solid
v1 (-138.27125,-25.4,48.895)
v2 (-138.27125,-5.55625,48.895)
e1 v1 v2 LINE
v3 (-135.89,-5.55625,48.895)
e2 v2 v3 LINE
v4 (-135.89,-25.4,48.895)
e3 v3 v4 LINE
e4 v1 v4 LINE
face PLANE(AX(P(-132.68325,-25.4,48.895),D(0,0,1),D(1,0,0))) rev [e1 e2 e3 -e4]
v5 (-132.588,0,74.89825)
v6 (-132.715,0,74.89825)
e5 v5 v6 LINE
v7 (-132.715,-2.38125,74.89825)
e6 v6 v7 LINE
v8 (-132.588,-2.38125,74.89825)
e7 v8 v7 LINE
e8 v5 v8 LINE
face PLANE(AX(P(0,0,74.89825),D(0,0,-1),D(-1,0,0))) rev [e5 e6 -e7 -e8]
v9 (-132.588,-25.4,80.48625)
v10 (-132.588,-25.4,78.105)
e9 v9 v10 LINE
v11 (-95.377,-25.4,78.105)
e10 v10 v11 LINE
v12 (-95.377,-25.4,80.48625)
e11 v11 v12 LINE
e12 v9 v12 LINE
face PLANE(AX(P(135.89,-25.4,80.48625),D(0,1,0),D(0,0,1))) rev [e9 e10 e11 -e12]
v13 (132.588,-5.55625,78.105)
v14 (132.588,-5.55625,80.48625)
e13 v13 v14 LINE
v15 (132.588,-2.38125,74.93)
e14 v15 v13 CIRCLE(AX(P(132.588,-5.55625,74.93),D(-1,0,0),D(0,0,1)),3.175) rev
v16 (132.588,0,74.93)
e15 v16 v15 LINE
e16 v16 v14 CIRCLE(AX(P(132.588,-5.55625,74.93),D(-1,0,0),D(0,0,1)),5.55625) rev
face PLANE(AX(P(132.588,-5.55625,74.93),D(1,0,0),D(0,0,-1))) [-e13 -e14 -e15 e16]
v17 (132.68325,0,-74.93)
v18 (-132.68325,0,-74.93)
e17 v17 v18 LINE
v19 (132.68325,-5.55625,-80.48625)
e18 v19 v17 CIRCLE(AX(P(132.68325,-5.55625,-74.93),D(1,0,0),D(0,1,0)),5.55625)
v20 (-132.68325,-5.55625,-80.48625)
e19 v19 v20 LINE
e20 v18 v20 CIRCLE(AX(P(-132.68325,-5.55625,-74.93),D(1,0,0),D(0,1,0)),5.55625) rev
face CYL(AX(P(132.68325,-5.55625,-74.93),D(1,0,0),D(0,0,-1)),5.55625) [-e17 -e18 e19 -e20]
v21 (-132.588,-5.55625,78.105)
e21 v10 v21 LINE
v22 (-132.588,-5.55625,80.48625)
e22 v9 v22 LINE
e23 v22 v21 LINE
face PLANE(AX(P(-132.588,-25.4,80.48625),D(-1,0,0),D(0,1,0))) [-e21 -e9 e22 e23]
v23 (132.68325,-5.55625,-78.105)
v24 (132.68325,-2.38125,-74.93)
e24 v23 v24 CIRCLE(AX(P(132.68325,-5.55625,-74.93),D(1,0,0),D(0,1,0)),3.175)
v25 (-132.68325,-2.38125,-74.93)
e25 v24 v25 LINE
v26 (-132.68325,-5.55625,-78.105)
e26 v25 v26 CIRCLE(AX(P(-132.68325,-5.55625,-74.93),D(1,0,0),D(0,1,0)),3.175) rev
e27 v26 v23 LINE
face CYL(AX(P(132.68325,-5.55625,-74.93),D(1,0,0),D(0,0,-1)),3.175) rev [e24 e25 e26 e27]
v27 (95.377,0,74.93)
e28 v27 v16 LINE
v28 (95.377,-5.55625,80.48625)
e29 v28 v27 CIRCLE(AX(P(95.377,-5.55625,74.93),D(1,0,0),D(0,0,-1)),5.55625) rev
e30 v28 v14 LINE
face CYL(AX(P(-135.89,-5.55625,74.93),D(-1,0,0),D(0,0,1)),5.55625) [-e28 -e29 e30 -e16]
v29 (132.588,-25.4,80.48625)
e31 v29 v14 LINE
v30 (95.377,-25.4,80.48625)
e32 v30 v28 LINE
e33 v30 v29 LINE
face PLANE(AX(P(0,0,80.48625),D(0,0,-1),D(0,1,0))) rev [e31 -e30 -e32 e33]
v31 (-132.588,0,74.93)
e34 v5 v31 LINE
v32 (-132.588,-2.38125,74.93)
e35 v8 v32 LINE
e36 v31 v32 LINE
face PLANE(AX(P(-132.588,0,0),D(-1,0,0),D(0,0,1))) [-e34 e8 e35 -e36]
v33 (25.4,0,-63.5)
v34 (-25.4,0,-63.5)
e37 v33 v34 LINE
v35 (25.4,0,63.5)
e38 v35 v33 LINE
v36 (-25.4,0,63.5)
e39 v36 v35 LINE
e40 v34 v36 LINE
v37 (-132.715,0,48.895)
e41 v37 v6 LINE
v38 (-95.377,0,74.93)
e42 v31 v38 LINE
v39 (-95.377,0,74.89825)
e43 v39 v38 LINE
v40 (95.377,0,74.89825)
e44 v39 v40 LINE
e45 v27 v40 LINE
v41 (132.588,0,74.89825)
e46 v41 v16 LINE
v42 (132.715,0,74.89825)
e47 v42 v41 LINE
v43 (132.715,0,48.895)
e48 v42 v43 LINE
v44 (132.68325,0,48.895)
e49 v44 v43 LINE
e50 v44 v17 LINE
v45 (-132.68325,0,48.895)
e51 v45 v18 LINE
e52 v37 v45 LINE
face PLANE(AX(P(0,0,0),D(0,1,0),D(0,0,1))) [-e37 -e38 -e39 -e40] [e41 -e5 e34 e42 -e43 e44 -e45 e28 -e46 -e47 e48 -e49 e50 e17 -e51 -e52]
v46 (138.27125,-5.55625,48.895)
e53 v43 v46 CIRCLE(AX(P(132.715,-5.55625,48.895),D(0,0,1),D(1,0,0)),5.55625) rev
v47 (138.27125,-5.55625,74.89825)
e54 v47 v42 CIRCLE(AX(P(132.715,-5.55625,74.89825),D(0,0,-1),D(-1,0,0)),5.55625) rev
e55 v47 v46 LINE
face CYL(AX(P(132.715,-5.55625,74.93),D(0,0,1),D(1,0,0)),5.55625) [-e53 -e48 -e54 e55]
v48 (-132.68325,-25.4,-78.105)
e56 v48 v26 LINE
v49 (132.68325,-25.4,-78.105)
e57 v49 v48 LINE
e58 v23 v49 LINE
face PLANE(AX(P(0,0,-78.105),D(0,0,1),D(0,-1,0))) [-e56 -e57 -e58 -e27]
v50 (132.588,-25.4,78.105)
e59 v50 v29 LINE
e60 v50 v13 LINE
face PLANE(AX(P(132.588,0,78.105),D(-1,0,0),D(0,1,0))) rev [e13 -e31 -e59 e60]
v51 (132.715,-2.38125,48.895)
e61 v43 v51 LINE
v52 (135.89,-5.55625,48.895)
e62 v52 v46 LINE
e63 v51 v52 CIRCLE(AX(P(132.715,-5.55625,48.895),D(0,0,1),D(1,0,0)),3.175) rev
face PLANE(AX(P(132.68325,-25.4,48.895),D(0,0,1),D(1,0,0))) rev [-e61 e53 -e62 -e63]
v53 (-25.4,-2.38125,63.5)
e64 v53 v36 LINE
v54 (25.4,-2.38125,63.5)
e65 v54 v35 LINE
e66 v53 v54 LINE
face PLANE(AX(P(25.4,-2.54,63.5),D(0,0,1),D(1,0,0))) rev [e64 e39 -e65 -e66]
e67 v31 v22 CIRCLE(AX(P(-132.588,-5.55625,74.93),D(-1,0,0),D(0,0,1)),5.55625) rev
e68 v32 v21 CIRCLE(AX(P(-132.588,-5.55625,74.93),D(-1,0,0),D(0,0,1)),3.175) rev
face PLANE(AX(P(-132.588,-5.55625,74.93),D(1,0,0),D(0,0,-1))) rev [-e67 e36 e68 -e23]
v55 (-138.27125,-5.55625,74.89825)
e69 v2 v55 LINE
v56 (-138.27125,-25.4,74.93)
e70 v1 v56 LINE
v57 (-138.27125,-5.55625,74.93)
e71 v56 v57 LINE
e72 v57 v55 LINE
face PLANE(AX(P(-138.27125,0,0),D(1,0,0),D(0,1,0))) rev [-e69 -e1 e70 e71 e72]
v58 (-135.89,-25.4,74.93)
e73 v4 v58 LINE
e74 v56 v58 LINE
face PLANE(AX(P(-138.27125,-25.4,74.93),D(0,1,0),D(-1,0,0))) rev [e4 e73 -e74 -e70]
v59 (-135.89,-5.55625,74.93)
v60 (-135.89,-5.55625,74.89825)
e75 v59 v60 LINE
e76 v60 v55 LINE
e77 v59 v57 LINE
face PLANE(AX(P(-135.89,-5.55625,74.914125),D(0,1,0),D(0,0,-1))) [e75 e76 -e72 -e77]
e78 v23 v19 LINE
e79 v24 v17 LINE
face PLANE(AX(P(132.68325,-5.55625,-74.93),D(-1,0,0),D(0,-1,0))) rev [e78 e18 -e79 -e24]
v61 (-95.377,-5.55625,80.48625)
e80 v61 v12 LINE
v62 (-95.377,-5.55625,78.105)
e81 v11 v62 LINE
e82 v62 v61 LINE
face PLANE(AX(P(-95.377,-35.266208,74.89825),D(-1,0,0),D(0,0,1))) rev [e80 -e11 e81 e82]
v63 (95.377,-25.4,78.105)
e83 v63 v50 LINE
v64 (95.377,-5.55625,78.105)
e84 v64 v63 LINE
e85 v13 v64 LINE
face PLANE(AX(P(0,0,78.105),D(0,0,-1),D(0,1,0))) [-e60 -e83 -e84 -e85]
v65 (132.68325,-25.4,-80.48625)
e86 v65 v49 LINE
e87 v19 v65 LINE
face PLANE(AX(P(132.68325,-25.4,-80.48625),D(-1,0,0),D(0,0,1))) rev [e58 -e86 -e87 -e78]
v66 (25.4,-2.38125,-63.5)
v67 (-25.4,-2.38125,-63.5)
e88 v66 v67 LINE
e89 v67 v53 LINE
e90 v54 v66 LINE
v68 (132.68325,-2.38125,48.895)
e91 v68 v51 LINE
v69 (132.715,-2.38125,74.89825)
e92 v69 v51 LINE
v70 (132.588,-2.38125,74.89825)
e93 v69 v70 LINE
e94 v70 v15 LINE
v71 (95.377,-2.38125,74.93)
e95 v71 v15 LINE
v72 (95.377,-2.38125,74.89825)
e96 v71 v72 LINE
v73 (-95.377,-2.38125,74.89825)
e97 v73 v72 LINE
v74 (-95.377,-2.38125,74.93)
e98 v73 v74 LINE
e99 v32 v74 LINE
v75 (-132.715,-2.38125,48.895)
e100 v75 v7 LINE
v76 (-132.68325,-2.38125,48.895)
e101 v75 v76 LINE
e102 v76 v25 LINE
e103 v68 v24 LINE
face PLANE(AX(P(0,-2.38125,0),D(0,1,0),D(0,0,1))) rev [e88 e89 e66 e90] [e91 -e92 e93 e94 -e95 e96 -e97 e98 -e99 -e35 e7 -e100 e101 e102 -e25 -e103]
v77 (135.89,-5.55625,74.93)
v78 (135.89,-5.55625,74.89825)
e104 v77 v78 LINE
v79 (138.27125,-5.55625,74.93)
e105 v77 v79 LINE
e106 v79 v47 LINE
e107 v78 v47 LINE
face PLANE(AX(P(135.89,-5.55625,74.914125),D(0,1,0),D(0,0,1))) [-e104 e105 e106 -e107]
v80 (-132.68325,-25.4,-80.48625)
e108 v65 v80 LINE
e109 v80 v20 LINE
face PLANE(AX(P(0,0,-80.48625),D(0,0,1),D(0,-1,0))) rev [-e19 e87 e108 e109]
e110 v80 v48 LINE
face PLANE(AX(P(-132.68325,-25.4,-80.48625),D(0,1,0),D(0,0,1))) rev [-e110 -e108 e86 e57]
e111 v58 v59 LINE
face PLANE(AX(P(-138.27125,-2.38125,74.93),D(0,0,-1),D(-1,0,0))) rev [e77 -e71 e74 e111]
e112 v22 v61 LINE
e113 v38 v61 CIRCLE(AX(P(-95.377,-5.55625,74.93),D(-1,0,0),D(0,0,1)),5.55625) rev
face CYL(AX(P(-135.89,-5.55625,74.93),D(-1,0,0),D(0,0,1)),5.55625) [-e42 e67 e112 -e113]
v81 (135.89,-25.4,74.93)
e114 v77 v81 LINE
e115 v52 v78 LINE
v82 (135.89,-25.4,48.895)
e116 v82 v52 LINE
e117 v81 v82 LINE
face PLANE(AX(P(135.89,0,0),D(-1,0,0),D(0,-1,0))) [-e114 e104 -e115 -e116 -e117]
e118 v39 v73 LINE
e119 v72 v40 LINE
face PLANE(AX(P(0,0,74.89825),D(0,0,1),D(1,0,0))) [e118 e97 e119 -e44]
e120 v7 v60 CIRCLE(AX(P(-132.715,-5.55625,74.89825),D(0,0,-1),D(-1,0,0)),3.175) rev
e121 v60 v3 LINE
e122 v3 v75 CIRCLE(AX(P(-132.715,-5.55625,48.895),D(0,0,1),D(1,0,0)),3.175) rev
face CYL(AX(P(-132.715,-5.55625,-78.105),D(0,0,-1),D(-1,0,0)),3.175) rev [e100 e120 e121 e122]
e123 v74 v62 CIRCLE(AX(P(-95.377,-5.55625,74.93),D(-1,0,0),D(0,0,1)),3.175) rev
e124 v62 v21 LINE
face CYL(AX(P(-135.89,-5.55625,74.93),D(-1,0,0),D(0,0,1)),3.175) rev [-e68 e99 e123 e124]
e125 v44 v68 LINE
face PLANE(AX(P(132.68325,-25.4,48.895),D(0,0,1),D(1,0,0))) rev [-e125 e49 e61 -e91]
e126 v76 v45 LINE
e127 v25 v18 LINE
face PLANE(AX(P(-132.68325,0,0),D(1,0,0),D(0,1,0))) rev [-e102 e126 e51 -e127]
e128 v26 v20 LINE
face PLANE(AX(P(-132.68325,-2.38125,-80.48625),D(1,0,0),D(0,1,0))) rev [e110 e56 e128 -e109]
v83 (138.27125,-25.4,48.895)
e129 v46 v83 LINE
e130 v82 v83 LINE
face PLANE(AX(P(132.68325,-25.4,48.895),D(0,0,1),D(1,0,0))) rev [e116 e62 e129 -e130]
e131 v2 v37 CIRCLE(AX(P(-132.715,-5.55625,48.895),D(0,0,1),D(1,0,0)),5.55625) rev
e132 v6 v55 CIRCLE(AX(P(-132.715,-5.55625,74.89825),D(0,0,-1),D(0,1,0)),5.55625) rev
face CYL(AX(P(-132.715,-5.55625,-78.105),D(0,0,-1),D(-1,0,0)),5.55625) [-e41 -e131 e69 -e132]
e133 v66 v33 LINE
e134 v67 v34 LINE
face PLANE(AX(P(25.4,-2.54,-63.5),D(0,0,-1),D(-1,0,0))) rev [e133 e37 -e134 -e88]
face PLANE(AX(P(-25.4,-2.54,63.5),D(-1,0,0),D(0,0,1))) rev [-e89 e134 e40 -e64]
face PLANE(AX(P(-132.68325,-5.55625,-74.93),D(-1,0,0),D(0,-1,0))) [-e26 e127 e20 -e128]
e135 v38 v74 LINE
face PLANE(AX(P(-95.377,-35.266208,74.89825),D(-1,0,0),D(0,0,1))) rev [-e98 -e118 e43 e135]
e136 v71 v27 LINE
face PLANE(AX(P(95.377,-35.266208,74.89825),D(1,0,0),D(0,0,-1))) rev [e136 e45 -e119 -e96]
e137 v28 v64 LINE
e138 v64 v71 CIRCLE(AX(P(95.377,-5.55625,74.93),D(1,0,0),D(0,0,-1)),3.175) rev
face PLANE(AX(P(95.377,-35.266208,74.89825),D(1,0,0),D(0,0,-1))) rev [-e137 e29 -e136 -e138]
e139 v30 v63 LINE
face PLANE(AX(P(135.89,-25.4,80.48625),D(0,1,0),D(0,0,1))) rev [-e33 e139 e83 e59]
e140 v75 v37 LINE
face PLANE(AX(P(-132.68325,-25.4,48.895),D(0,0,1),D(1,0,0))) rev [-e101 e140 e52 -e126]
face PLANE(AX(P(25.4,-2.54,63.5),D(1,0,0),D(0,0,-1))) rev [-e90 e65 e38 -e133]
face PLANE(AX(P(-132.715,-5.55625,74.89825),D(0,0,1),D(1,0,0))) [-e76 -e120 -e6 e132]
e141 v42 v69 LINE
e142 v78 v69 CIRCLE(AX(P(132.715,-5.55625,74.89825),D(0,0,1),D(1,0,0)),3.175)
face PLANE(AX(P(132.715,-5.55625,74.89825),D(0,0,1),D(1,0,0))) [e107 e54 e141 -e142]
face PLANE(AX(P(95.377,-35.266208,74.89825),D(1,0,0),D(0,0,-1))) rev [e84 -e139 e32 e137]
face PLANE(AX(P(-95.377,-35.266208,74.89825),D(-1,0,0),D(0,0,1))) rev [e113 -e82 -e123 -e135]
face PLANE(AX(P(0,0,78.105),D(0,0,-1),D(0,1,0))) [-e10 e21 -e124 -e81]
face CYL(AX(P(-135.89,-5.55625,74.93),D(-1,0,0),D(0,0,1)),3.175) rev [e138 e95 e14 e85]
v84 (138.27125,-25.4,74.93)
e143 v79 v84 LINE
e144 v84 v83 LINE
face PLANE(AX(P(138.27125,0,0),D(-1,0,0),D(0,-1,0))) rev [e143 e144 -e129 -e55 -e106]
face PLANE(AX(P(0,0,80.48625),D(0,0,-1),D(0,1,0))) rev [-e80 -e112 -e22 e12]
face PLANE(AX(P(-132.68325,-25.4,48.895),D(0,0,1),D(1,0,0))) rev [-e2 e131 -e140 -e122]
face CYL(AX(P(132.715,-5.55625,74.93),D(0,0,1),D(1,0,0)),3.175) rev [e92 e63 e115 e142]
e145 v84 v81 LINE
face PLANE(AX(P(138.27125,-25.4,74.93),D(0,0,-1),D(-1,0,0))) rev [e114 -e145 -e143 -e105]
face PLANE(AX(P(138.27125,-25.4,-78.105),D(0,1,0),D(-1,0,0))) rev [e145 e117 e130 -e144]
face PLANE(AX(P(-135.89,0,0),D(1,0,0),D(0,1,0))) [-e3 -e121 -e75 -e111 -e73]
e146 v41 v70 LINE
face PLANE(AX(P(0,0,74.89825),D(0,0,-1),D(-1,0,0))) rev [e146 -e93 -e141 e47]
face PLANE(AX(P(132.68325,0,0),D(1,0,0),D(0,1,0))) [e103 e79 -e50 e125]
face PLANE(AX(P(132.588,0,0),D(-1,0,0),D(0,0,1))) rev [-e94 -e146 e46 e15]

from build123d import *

# Parameters (mm, degrees)
SKETCH1_W                    = 271.78
SKETCH1_H                    = 156.21
BASE_FLANGE1_DEPTH           = 2.38125
EDGE_FLANGE1_STRIP_W         = 15.875
EDGE_FLANGE1_STRIP_H         = 2.38125
EDGE_FLANGE1_STRIP_CUT_DEPTH = 271.78
EDGE_FLANGE1_DEPTH           = 271.78
EDGE_FLANGE2_STRIP_W         = 15.875
EDGE_FLANGE2_STRIP_H         = 2.38125
EDGE_FLANGE2_STRIP_CUT_DEPTH = 153.035
EDGE_FLANGE2_DEPTH           = 153.035
SKETCH14_W                   = 127
SKETCH14_H                   = 30.097595223
CUT_EXTRUDE1_DEPTH           = 5.588
EDGE_FLANGE3_STRIP_W         = 15.875
EDGE_FLANGE3_STRIP_H         = 2.38125
EDGE_FLANGE3_STRIP_CUT_DEPTH = 153.035
EDGE_FLANGE3_DEPTH           = 153.035
SKETCH18_W                   = 127
SKETCH18_H                   = 45.504454023
CUT_EXTRUDE2_DEPTH           = 5.588
CUT_EXTRUDE3_START           = -3.302
CUT_EXTRUDE3_DEPTH           = 5.68325
CUT_EXTRUDE4_START           = -3.302
CUT_EXTRUDE4_DEPTH           = 5.68325
EDGE_FLANGE4_STRIP_W         = 15.875
EDGE_FLANGE4_STRIP_H         = 2.38125
EDGE_FLANGE4_STRIP_CUT_DEPTH = 265.3665
EDGE_FLANGE4_DEPTH           = 265.3665
SKETCH24_W                   = 190.754
SKETCH24_H                   = 70.532416994
CUT_EXTRUDE5_DEPTH           = 5.588
SKETCH25_W                   = 50.8
SKETCH25_H                   = 127
CUT_EXTRUDE6_DEPTH           = 2.54


# Read off the part's stored shape, not the designer's step: Cut-Extrude3, Cut-Extrude4
# Sheet-metal steps are written as plain solids
with BuildPart() as part:
    # Sketch1 → Base-Flange1 (new body)
    with BuildSketch(Plane(origin=(0, 0, 0), x_dir=(1, 0, 0), z_dir=(0, 1, 0))):
        Rectangle(SKETCH1_W, SKETCH1_H)
    extrude(amount=-BASE_FLANGE1_DEPTH)

    # Edge-Flange1 strip (across the edge) → Edge-Flange1 strip cut (cut)
    with BuildSketch(Plane(origin=(135.89, -2.38125, 78.105), x_dir=(0, 0, -1), z_dir=(-1, 0, 0))):
        with Locations((-4.7625, -1.190625)):
            Rectangle(EDGE_FLANGE1_STRIP_W, EDGE_FLANGE1_STRIP_H)
    extrude(amount=EDGE_FLANGE1_STRIP_CUT_DEPTH, mode=Mode.SUBTRACT)

    # Edge-Flange1 section (across the edge) → Edge-Flange1 (add)
    with BuildSketch(Plane(origin=(135.89, -2.38125, 78.105), x_dir=(0, 0, -1), z_dir=(-1, 0, 0))):
        with BuildLine():
            Line((-2.38125, 3.175), (-2.38125, 23.01875))
            Line((-2.38125, 23.01875), (0, 23.01875))
            Line((0, 23.01875), (0, 3.175))
            ThreePointArc((0, 3.175), (0.92993597, 0.92993597), (3.175, 0))
            Line((3.175, 0), (3.175, -2.38125))
            ThreePointArc((3.175, -2.38125), (-0.753862053, -0.753862053), (-2.38125, 3.175))
        make_face()
    extrude(amount=EDGE_FLANGE1_DEPTH)

    # Edge-Flange2 strip (across the edge) → Edge-Flange2 strip cut (cut)
    with BuildSketch(Plane(origin=(135.89, -2.38125, -78.105), x_dir=(-1, 0, 0), z_dir=(0, 0, 1))):
        with Locations((-4.7625, -1.190625)):
            Rectangle(EDGE_FLANGE2_STRIP_W, EDGE_FLANGE2_STRIP_H)
    extrude(amount=EDGE_FLANGE2_STRIP_CUT_DEPTH, mode=Mode.SUBTRACT)

    # Edge-Flange2 section (across the edge) → Edge-Flange2 (add)
    with BuildSketch(Plane(origin=(135.89, -2.38125, -78.105), x_dir=(-1, 0, 0), z_dir=(0, 0, 1))):
        with BuildLine():
            Line((-2.38125, 3.175), (-2.38125, 23.01875))
            Line((-2.38125, 23.01875), (0, 23.01875))
            Line((0, 23.01875), (0, 3.175))
            ThreePointArc((0, 3.175), (0.92993597, 0.92993597), (3.175, 0))
            Line((3.175, 0), (3.175, -2.38125))
            ThreePointArc((3.175, -2.38125), (-0.753862053, -0.753862053), (-2.38125, 3.175))
        make_face()
    extrude(amount=EDGE_FLANGE2_DEPTH)

    # Sketch14 → Cut-Extrude1 (cut)
    with BuildSketch(Plane(origin=(138.27125, 0, 0), x_dir=(0, 0, -1), z_dir=(1, 0, 0))):
        with Locations((14.605, -10.351202389)):
            Rectangle(SKETCH14_W, SKETCH14_H)
    extrude(amount=-CUT_EXTRUDE1_DEPTH, mode=Mode.SUBTRACT)

    # Edge-Flange3 strip (across the edge) → Edge-Flange3 strip cut (cut)
    with BuildSketch(Plane(origin=(-135.89, -2.38125, 74.93), x_dir=(1, 0, 0), z_dir=(0, 0, -1))):
        with Locations((-4.7625, -1.190625)):
            Rectangle(EDGE_FLANGE3_STRIP_W, EDGE_FLANGE3_STRIP_H)
    extrude(amount=EDGE_FLANGE3_STRIP_CUT_DEPTH, mode=Mode.SUBTRACT)

    # Edge-Flange3 section (across the edge) → Edge-Flange3 (add)
    with BuildSketch(Plane(origin=(-135.89, -2.38125, 74.93), x_dir=(1, 0, 0), z_dir=(0, 0, -1))):
        with BuildLine():
            Line((-2.38125, 3.175), (-2.38125, 23.01875))
            Line((-2.38125, 23.01875), (0, 23.01875))
            Line((0, 23.01875), (0, 3.175))
            ThreePointArc((0, 3.175), (0.92993597, 0.92993597), (3.175, 0))
            Line((3.175, 0), (3.175, -2.38125))
            ThreePointArc((3.175, -2.38125), (-0.753862053, -0.753862053), (-2.38125, 3.175))
        make_face()
    extrude(amount=EDGE_FLANGE3_DEPTH)

    # Sketch18 → Cut-Extrude2 (cut)
    with BuildSketch(Plane.ZY.offset(138.27125)):
        with Locations((-14.605, -2.647772988)):
            Rectangle(SKETCH18_W, SKETCH18_H)
    extrude(amount=-CUT_EXTRUDE2_DEPTH, mode=Mode.SUBTRACT)

    # Cut-Extrude3 outline → Cut-Extrude3 (cut)
    with BuildSketch(Plane.ZY.offset(135.89).offset(CUT_EXTRUDE3_START)):
        with BuildLine():
            Line((74.93, 0), (74.89825, 0))
            Line((74.89825, 0), (74.89825, -5.55625))
            Line((74.89825, -5.55625), (74.93, -5.55625))
            Line((74.93, -5.55625), (74.93, -2.38125))
            ThreePointArc((74.93, -2.38125), (77.17506403, -3.31118597), (78.105, -5.55625))
            Line((78.105, -5.55625), (78.105, -25.4))
            Line((78.105, -25.4), (80.48625, -25.4))
            Line((80.48625, -25.4), (80.48625, -5.55625))
            ThreePointArc((80.48625, -5.55625), (78.858862053, -1.627387947), (74.93, 0))
        make_face()
    extrude(amount=CUT_EXTRUDE3_DEPTH, mode=Mode.SUBTRACT)

    # Cut-Extrude4 outline → Cut-Extrude4 (cut)
    with BuildSketch(Plane(origin=(135.89, 0, 0), x_dir=(0, 0, -1), z_dir=(1, 0, 0)).offset(CUT_EXTRUDE4_START)):
        with BuildLine():
            Line((-74.89825, 0), (-74.93, 0))
            ThreePointArc((-74.93, 0), (-78.858862053, -1.627387947), (-80.48625, -5.55625))
            Line((-80.48625, -5.55625), (-80.48625, -25.4))
            Line((-80.48625, -25.4), (-78.105, -25.4))
            Line((-78.105, -25.4), (-78.105, -5.55625))
            ThreePointArc((-78.105, -5.55625), (-77.17506403, -3.31118597), (-74.93, -2.38125))
            Line((-74.93, -2.38125), (-74.93, -5.55625))
            Line((-74.93, -5.55625), (-74.89825, -5.55625))
            Line((-74.89825, -5.55625), (-74.89825, 0))
        make_face()
    extrude(amount=CUT_EXTRUDE4_DEPTH, mode=Mode.SUBTRACT)

    # Edge-Flange4 strip (across the edge) → Edge-Flange4 strip cut (cut)
    with BuildSketch(Plane(origin=(-132.68325, -2.38125, -78.105), x_dir=(0, 0, 1), z_dir=(1, 0, 0))):
        with Locations((-4.7625, -1.190625)):
            Rectangle(EDGE_FLANGE4_STRIP_W, EDGE_FLANGE4_STRIP_H)
    extrude(amount=EDGE_FLANGE4_STRIP_CUT_DEPTH, mode=Mode.SUBTRACT)

    # Edge-Flange4 section (across the edge) → Edge-Flange4 (add)
    with BuildSketch(Plane(origin=(-132.68325, -2.38125, -78.105), x_dir=(0, 0, 1), z_dir=(1, 0, 0))):
        with BuildLine():
            Line((-2.38125, 3.175), (-2.38125, 23.01875))
            Line((-2.38125, 23.01875), (0, 23.01875))
            Line((0, 23.01875), (0, 3.175))
            ThreePointArc((0, 3.175), (0.92993597, 0.92993597), (3.175, 0))
            Line((3.175, 0), (3.175, -2.38125))
            ThreePointArc((3.175, -2.38125), (-0.753862053, -0.753862053), (-2.38125, 3.175))
        make_face()
    extrude(amount=EDGE_FLANGE4_DEPTH)

    # Sketch24 → Cut-Extrude5 (cut)
    with BuildSketch(Plane.XY.offset(80.48625)):
        Rectangle(SKETCH24_W, SKETCH24_H)
    extrude(amount=-CUT_EXTRUDE5_DEPTH, mode=Mode.SUBTRACT)

    # Sketch25 → Cut-Extrude6 (cut)
    with BuildSketch(Plane(origin=(0, 0, 0), x_dir=(1, 0, 0), z_dir=(0, 1, 0))):
        Rectangle(SKETCH25_W, SKETCH25_H)
    extrude(amount=-CUT_EXTRUDE6_DEPTH, mode=Mode.SUBTRACT)


solid = part.part
